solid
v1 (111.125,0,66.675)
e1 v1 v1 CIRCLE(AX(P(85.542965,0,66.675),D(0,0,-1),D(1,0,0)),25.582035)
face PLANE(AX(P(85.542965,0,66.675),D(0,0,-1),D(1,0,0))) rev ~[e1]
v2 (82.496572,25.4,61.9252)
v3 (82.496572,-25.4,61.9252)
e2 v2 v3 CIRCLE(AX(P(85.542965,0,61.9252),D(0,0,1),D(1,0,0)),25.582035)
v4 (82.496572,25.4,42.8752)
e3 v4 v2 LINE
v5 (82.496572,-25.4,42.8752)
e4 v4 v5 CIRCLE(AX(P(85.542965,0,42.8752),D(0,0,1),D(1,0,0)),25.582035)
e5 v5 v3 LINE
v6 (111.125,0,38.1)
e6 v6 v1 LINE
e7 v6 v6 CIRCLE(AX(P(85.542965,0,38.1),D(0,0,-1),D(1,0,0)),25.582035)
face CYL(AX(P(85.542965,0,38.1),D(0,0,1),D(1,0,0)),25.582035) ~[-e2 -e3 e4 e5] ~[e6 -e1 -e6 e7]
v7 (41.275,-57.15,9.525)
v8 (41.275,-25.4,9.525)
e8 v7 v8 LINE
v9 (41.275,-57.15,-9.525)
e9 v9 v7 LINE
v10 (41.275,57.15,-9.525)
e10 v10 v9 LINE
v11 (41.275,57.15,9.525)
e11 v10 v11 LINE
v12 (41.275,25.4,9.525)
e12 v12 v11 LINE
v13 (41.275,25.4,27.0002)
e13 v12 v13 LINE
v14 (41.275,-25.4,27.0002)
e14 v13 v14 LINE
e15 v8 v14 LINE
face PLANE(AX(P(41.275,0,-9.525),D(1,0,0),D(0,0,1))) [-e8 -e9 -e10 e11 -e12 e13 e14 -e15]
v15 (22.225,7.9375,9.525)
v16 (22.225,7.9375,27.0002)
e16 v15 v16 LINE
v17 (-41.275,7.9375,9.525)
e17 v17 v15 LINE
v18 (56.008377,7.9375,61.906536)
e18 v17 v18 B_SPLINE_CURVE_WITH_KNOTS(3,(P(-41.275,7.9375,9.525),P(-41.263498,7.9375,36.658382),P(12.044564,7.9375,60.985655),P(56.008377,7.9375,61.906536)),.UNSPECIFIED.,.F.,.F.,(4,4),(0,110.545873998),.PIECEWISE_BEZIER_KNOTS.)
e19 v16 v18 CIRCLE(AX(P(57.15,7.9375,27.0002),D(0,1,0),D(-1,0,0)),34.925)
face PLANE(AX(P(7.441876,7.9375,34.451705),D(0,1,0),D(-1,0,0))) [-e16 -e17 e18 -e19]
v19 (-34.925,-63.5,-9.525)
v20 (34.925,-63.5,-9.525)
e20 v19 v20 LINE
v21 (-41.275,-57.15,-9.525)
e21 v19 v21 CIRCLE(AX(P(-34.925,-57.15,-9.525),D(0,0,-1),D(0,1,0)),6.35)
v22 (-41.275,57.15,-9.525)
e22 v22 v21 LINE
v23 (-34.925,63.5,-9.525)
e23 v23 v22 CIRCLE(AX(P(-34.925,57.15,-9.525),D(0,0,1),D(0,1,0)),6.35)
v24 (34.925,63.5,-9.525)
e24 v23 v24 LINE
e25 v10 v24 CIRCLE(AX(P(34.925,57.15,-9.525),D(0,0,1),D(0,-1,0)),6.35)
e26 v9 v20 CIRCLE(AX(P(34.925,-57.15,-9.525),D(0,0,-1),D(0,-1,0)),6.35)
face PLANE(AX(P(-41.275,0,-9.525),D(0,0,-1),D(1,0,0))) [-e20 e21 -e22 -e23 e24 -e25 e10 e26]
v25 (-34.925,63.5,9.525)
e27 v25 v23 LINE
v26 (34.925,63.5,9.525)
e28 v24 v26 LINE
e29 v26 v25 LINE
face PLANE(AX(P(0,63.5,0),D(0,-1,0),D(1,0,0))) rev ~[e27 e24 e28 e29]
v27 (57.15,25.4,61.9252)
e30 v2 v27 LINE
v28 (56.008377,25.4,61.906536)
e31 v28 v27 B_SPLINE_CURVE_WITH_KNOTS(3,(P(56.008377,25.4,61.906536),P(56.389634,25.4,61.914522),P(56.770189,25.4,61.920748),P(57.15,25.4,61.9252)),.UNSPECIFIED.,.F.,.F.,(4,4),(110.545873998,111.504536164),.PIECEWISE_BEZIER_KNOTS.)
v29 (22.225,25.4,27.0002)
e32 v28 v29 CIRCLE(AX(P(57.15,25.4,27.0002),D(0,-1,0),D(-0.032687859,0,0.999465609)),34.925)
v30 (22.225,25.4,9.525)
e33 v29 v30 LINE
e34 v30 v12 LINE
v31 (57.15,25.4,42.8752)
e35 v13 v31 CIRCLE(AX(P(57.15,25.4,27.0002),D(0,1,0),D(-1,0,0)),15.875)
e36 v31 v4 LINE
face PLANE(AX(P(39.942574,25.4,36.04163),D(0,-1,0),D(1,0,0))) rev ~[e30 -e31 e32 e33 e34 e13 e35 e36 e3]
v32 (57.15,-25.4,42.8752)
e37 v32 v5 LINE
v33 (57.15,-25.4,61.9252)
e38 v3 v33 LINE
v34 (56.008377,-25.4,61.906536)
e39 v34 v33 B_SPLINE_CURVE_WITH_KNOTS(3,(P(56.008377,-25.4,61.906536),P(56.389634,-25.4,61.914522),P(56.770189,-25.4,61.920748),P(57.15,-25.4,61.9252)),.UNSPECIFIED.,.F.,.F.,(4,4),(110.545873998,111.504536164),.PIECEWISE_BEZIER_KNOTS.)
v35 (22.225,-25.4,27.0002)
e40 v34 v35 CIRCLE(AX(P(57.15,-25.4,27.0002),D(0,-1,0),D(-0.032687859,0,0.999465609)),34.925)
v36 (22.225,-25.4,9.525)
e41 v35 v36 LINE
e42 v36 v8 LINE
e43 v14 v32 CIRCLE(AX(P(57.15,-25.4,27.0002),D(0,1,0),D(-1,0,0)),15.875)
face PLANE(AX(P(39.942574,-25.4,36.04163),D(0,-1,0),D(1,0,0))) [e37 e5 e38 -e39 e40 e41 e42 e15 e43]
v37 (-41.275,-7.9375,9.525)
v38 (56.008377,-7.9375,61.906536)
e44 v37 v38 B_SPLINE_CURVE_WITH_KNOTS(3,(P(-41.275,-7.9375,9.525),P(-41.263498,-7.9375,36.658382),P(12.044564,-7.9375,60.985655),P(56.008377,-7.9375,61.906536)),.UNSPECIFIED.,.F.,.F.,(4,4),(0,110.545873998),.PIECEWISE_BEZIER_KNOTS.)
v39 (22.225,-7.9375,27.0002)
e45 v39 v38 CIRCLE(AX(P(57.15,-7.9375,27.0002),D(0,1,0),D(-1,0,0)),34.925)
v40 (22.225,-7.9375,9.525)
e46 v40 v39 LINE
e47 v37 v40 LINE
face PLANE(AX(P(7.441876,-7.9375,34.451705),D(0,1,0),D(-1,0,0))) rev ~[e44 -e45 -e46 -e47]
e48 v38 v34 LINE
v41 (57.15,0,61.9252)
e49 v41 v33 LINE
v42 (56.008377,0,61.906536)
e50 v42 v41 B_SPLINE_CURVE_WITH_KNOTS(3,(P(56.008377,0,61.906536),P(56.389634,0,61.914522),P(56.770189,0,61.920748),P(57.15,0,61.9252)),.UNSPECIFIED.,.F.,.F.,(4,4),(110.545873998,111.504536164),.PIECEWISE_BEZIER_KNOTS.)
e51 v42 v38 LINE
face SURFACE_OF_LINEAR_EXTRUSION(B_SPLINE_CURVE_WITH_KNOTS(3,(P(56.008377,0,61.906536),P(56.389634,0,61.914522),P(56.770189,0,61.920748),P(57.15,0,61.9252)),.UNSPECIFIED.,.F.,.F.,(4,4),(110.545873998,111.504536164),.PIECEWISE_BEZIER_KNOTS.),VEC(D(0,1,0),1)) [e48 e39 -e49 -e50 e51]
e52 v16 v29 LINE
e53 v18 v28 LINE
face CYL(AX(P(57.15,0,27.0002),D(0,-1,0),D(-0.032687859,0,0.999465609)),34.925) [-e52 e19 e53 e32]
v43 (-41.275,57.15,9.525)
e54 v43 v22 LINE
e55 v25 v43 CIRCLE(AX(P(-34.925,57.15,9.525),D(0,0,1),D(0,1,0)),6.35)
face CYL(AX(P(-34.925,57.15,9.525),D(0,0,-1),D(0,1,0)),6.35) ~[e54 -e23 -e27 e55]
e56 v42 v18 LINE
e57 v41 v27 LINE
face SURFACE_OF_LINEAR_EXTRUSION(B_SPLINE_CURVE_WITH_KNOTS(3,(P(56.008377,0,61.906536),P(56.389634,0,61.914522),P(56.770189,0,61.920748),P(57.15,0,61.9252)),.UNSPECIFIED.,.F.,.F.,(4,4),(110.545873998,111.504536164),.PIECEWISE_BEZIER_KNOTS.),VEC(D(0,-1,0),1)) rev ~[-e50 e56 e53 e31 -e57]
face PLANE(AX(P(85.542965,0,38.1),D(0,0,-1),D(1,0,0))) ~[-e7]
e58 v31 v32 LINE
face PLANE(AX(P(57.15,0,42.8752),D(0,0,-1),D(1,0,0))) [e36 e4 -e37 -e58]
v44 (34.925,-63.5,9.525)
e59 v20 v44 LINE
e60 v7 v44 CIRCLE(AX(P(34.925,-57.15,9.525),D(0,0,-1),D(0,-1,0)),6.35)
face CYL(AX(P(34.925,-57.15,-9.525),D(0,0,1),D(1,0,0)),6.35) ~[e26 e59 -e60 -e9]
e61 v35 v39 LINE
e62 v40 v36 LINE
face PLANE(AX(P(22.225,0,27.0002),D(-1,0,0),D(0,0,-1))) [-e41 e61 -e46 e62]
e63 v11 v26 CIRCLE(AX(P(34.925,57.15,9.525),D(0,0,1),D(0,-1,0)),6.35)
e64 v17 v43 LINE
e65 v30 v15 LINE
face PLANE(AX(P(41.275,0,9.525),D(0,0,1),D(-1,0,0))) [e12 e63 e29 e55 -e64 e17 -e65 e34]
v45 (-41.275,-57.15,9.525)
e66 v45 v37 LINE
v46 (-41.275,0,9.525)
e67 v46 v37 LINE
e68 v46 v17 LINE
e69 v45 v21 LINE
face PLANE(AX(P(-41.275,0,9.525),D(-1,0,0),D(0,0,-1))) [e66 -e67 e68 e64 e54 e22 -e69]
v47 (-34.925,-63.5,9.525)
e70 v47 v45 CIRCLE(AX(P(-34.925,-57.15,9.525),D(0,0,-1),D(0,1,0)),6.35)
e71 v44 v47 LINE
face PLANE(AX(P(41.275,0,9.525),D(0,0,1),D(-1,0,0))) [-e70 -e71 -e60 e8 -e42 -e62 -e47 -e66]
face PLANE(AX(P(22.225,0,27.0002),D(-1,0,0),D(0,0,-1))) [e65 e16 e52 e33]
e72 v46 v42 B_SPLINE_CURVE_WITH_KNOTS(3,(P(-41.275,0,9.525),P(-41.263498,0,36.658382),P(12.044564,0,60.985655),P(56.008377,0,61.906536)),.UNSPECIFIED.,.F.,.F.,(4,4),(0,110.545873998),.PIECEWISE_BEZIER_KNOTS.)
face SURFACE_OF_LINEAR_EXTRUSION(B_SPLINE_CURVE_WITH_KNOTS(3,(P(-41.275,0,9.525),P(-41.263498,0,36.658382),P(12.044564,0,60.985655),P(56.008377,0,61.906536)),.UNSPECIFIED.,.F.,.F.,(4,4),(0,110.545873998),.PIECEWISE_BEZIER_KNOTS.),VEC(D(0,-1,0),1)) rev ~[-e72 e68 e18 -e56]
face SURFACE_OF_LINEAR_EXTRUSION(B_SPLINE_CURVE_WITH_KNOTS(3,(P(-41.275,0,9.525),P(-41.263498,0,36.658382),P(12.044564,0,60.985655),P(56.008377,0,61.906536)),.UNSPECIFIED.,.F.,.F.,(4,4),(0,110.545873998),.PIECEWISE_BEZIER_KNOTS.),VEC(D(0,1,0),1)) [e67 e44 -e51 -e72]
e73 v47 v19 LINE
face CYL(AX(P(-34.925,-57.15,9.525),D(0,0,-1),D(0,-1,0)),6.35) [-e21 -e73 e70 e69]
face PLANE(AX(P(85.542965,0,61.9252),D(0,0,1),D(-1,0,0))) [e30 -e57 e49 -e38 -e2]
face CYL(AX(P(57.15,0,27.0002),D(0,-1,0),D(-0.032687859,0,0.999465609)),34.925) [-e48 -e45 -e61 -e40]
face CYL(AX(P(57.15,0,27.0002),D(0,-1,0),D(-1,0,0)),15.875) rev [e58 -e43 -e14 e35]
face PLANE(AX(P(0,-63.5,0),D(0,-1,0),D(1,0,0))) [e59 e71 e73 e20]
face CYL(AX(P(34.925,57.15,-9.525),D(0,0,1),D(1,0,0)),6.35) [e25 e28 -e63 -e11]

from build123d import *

# Parameters (mm, degrees)
F1_DEPTH = 63.5
F0_W     = 25.2179650775
F0_H     = 19.05
F2_DEPTH = 25.4
F3_DEPTH = 7.9375
F5_R     = 6.35


# Not quite as in the source:
# - a feature names something its author has since deleted; it is built from what else it names


with BuildPart() as f1:
    # F0 (on Front) → F1 (new body, symmetric)
    with BuildSketch(Plane.XZ):
        Polygon((22.225, 9.525), (-41.275, 9.525), (-41.275, -9.525), (41.275, -9.525), (41.275, 9.525), align=None)
    extrude(amount=F1_DEPTH, both=True)

    # F0 (on Front) → F2 (join, symmetric)
    with BuildSketch(Plane.XZ):
        with BuildLine():
            Line((22.225, 27.0002), (22.225, 9.525))
            Line((22.225, 9.525), (41.275, 9.525))
            Line((41.275, 9.525), (41.275, 27.0002))
            ThreePointArc((41.275, 27.0002), (45.9246798487, 38.2255201513), (57.15, 42.8752))
            Line((57.15, 42.8752), (60.325, 42.8752))
            Line((60.325, 42.8752), (60.325, 61.9252))
            Line((60.325, 61.9252), (57.15, 61.9252))
            add(Edge.make_bspline(
                [(56.0083765395, 61.9065364001), (56.3896340439, 61.9145223536), (56.7701888152, 61.920748032), (57.15, 61.9252)],
                knots=[110.545873998, 110.545873998, 110.545873998, 110.545873998, 111.5045361635, 111.5045361635, 111.5045361635, 111.5045361635], degree=3))
            ThreePointArc((56.0083765395, 61.9065364001), (32.0539163976, 51.2889260436), (22.225, 27.0002))
        make_face()
        with Locations((72.9339825387, 52.4002)):
            Rectangle(F0_W, F0_H)
    extrude(amount=F2_DEPTH, both=True)

    # F0 (on Front) → F3 (join, symmetric)
    with BuildSketch(Plane.XZ):
        with BuildLine():
            add(Edge.make_bspline(
                [(-41.275, 9.525), (-41.2634975333, 36.6583816825), (12.04456367, 60.9856549384), (56.0083765395, 61.9065364001)],
                knots=[0, 0, 0, 0, 110.545873998, 110.545873998, 110.545873998, 110.545873998], degree=3))
            Line((-41.275, 9.525), (22.225, 9.525))
            Line((22.225, 9.525), (22.225, 27.0002))
            ThreePointArc((22.225, 27.0002), (32.0539163976, 51.2889260436), (56.0083765395, 61.9065364001))
        make_face()
    extrude(amount=F3_DEPTH, both=True)

    # F0 (on Front) → F4 (revolve)
    with BuildSketch(Plane.XZ):
        Polygon((85.5429650775, 66.675), (85.5429650775, 61.9252), (85.5429650775, 42.8752), (85.5429650775, 38.1), (111.125, 38.1), (111.125, 66.675), align=None)
    revolve(axis=Axis((85.5429650775, 0, 52.3875), (0, 0, -1)))

    # F5
    f5_edges = [f1.edges().sort_by_distance(p)[0] for p in [
        (41.275, -63.5, 0),
        (-41.275, -63.5, 0),
        (41.275, 63.5, 0),
        (-41.275, 63.5, 0),
    ]]
    fillet(f5_edges, radius=F5_R)


solid = f1.part
